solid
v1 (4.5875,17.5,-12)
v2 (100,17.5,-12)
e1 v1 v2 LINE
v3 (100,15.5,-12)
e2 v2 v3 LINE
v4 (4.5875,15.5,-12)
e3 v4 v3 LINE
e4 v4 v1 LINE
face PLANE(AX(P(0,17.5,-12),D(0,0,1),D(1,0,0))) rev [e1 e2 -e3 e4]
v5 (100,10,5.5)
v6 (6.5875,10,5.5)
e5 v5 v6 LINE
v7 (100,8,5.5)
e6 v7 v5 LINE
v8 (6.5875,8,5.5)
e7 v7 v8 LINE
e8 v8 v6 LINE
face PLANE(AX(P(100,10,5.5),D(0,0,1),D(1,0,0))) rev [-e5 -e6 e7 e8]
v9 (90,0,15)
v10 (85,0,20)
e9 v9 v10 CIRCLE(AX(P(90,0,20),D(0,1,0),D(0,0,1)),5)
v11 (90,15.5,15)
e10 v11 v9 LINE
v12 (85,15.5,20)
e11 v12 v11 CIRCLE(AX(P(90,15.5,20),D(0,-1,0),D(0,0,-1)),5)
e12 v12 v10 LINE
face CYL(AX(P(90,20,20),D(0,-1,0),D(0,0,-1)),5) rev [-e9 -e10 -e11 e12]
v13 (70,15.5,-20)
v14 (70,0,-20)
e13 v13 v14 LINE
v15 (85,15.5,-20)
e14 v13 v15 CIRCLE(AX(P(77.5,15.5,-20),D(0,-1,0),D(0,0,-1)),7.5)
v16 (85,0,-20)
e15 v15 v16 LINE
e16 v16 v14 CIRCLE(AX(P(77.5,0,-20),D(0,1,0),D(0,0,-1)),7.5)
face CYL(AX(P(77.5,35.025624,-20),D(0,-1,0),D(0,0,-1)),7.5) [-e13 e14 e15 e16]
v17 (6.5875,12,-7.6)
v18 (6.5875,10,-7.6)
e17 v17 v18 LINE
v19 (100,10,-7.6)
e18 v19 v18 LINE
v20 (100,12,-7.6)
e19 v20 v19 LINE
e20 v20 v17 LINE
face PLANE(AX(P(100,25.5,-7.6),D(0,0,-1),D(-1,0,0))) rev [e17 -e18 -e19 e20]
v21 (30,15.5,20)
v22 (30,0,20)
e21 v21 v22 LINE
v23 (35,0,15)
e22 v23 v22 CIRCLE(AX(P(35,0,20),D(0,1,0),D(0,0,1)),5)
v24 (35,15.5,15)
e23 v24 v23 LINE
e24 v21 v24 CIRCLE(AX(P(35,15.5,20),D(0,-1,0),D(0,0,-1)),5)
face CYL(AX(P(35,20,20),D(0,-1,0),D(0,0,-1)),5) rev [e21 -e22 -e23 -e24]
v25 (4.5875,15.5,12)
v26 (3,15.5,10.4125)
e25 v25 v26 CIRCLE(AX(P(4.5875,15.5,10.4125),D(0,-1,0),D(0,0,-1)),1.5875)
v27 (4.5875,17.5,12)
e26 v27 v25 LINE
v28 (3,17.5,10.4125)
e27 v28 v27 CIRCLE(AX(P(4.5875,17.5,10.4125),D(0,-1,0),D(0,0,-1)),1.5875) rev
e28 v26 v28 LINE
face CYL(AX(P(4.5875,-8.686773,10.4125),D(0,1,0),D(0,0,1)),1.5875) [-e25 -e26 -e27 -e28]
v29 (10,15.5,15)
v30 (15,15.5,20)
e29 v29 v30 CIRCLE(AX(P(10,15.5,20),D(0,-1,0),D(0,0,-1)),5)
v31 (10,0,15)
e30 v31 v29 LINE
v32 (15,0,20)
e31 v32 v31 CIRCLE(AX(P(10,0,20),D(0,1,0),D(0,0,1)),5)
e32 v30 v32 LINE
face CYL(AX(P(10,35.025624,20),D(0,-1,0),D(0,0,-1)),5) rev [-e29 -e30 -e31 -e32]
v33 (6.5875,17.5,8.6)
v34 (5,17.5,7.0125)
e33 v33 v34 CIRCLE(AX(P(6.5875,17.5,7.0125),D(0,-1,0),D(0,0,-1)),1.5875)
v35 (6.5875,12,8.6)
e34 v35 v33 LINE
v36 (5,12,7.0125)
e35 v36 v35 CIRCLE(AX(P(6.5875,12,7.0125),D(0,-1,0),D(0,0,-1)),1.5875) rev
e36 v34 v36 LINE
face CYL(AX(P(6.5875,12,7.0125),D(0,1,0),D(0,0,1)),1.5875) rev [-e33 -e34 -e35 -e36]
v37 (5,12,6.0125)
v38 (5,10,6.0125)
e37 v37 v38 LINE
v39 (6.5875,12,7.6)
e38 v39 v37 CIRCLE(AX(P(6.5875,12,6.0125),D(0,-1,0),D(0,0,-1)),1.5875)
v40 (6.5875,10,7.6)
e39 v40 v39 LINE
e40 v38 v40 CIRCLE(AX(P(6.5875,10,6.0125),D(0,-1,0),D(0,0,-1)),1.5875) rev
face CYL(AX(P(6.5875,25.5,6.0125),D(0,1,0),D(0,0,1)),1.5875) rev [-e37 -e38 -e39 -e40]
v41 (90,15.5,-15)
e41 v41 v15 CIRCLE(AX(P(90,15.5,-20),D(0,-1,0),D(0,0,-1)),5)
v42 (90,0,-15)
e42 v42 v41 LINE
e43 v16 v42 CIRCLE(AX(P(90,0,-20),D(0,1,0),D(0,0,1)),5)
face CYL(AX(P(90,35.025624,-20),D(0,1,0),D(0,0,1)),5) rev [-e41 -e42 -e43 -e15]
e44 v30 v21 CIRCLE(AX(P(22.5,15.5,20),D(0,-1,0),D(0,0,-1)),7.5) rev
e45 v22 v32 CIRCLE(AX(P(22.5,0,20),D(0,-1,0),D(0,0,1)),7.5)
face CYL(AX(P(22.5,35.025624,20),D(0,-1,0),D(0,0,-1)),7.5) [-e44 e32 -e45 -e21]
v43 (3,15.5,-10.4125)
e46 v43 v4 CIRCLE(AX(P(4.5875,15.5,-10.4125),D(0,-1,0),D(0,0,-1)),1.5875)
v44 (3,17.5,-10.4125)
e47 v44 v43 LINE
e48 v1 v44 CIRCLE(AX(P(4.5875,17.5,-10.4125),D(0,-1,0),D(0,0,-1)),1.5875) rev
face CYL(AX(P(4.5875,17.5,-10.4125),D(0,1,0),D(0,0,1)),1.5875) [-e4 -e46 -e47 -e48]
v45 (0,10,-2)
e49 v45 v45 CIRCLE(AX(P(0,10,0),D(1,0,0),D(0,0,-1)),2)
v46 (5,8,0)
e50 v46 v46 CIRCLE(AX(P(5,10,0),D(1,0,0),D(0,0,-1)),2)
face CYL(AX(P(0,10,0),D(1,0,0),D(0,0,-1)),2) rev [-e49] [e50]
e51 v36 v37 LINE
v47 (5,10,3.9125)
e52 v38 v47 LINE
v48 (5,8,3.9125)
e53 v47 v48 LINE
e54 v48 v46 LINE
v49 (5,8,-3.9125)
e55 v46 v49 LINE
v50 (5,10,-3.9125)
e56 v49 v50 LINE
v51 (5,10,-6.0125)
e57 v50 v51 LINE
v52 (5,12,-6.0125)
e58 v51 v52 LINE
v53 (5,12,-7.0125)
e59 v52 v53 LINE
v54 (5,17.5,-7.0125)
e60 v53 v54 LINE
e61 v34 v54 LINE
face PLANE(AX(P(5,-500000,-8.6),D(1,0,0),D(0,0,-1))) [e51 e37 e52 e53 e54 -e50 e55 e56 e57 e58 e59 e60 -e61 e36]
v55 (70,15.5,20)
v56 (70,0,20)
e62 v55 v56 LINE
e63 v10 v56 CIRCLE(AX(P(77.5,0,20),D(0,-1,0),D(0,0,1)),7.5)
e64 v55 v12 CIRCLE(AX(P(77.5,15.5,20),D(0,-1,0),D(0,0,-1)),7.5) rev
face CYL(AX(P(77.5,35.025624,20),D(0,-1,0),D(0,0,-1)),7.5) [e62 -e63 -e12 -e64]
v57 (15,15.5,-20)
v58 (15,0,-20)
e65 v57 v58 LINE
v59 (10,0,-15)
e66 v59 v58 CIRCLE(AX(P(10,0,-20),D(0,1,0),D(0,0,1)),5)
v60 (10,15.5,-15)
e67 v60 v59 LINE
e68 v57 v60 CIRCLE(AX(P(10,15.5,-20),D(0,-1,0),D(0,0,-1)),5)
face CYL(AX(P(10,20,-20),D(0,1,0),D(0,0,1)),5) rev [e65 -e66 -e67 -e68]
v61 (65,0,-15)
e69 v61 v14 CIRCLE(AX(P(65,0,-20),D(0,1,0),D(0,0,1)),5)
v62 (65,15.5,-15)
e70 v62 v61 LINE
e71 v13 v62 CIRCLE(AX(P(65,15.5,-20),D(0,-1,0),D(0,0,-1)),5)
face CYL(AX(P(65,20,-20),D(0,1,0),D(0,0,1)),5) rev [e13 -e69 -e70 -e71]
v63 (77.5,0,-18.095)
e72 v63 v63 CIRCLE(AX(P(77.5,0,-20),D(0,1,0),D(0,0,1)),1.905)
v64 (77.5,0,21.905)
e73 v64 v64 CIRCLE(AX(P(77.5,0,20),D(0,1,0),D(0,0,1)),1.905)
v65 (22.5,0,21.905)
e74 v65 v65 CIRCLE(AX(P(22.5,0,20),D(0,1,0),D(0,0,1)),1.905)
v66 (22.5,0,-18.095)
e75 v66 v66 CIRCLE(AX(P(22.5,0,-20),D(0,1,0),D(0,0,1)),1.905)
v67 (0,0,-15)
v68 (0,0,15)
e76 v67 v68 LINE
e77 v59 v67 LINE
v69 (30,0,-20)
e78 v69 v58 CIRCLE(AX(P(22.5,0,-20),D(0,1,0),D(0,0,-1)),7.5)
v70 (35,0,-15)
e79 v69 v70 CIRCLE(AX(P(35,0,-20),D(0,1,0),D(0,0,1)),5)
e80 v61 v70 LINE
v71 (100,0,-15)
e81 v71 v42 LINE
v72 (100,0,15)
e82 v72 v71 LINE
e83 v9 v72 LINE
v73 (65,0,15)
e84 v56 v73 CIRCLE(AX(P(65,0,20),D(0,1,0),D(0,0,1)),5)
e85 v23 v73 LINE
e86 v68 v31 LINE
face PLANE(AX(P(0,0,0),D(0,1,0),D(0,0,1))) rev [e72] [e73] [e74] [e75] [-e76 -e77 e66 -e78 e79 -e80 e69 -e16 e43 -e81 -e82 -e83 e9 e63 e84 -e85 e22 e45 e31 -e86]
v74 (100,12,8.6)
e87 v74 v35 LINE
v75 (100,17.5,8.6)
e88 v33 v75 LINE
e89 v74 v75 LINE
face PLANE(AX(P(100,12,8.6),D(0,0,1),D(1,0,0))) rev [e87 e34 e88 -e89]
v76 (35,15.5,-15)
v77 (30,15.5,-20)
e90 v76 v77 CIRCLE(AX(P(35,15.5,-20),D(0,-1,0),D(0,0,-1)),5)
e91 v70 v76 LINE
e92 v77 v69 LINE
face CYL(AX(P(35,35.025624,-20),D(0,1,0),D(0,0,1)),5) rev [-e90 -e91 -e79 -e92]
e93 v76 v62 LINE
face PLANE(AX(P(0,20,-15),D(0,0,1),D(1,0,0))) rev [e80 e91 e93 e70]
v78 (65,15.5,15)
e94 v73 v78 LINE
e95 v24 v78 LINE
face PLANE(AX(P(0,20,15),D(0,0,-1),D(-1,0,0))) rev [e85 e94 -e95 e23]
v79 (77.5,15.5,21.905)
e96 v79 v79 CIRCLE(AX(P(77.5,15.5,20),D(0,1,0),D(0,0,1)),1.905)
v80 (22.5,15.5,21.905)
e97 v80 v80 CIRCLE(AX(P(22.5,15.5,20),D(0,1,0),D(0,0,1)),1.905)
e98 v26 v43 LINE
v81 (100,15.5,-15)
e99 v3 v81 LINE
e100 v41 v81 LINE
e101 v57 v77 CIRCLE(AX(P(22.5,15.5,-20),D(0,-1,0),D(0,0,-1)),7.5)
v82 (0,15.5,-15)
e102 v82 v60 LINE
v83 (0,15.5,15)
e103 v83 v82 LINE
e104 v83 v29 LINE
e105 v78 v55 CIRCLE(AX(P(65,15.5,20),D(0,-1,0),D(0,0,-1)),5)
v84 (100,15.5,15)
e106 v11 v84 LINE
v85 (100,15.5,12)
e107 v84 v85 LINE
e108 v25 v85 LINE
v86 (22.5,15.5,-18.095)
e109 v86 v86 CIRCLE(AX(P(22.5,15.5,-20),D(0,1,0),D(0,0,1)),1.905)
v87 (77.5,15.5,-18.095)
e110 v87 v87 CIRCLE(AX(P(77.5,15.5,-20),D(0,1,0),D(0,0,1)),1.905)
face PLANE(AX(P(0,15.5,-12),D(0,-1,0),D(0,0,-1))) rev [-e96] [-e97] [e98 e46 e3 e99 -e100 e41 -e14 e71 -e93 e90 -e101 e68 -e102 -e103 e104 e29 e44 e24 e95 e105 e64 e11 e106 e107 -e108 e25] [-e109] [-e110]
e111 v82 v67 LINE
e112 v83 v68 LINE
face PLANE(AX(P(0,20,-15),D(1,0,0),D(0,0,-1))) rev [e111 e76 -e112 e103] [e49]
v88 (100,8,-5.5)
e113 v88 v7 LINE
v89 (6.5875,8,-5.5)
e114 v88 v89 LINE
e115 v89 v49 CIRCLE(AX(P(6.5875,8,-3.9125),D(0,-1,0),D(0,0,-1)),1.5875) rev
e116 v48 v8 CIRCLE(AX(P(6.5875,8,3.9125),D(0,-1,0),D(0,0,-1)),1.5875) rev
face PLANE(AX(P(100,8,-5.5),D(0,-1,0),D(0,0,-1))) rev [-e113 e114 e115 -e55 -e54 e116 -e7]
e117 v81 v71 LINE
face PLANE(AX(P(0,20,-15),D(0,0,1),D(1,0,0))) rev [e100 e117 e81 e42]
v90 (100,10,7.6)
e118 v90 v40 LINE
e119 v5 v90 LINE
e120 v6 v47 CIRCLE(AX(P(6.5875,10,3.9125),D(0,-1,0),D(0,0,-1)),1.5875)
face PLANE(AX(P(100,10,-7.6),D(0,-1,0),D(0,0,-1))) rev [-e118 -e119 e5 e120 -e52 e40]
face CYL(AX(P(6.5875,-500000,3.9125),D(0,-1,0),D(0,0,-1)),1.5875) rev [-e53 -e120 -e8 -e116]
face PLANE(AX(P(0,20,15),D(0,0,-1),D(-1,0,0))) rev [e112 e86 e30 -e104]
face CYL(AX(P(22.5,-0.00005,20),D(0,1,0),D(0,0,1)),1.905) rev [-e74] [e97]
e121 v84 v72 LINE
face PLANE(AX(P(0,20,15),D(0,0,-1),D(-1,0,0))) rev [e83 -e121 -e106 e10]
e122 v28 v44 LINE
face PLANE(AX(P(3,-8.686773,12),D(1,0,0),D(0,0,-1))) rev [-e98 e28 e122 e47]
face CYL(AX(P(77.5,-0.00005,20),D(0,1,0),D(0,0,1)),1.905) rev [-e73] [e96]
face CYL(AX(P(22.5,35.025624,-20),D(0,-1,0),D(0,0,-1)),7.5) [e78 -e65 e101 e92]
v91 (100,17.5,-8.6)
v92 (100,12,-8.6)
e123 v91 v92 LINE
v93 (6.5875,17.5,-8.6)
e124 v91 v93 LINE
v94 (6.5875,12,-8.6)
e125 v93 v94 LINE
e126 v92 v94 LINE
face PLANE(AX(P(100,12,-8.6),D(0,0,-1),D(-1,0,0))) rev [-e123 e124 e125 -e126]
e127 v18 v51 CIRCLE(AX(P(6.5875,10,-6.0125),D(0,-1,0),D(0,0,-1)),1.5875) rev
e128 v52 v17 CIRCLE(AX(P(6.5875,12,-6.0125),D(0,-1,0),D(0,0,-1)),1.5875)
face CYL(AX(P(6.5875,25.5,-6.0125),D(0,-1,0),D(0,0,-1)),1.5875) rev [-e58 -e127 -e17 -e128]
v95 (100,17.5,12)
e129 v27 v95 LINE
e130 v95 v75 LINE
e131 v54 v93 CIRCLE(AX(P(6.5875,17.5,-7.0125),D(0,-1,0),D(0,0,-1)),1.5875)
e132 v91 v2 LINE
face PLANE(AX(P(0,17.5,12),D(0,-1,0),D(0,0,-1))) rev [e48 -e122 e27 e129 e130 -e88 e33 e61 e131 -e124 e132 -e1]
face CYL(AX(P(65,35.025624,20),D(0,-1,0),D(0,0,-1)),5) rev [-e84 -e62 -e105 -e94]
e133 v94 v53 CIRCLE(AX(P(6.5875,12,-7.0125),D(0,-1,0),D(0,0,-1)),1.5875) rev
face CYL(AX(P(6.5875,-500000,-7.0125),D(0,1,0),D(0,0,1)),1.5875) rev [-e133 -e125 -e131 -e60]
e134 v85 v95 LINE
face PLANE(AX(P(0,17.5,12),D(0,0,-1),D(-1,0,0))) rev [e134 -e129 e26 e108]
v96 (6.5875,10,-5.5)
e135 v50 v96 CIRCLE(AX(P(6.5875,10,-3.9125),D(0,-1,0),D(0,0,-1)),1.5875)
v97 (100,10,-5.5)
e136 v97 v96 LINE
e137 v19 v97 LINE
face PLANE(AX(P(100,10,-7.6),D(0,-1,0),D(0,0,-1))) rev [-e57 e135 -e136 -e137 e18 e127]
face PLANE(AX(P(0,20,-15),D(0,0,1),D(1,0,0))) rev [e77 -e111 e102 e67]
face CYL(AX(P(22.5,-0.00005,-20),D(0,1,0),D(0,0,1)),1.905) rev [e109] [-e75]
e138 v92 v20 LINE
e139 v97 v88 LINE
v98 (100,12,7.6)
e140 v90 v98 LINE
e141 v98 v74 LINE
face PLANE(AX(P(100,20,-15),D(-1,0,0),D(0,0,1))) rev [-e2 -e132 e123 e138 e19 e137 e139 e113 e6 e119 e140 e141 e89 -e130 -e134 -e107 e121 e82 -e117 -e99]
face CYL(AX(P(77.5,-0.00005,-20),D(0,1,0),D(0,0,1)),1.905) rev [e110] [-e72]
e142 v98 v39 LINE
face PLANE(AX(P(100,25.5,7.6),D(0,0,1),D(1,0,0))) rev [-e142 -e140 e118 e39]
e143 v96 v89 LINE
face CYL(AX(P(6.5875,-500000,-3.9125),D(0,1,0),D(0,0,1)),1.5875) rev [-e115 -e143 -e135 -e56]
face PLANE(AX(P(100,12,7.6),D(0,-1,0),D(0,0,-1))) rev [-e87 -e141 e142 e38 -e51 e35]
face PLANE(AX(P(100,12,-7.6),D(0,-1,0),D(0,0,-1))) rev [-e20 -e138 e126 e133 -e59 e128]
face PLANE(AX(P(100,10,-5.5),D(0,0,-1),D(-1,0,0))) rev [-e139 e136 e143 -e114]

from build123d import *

# Parameters (mm, degrees)
SKETCH1_W           = 100
SKETCH1_H           = 30
BOSS_EXTRUDE1_DEPTH = 20
SKETCH2_W           = 15.2
SKETCH2_H           = 15.5
CUT_EXTRUDE1_DEPTH  = 104.07764064
SKETCH3_W           = 11
SKETCH3_H           = 2
CUT_EXTRUDE2_DEPTH  = 104.07764064
SKETCH4_W           = 1
SKETCH4_H           = 8
CUT_EXTRUDE3_DEPTH  = 104.07764064
CUT_EXTRUDE4_DEPTH  = 104.07764064
BOSS_EXTRUDE2_REACH = 104.622
SKETCH6_W           = 5
SKETCH6_H           = 17.2
FILLET1_R           = 1.5875
FILLET2_R           = 1.5875
SKETCH7_W           = 3
SKETCH7_H           = 24
CUT_EXTRUDE5_DEPTH  = 2
FILLET3_R           = 1.5875
BOSS_EXTRUDE3_DEPTH = 15.5
SKETCH9_R           = 1.905
CUT_EXTRUDE6_DEPTH  = 105.864197894
FILLET4_R           = 5
SKETCH10_R          = 2
CUT_EXTRUDE7_DEPTH  = 101.436547133


# Some blends are built 0.0001 mm under size
with BuildPart() as part:
    # Sketch1 → Boss-Extrude1 (new body)
    with BuildSketch(Plane(origin=(0, 0, 0), x_dir=(1, 0, 0), z_dir=(0, 1, 0))):
        with Locations((50, 0)):
            Rectangle(SKETCH1_W, SKETCH1_H)
    extrude(amount=BOSS_EXTRUDE1_DEPTH)

    # Sketch2 → Cut-Extrude1 (cut, through all)
    with BuildSketch(Plane.ZY):
        with Locations((0, 17.75)):
            Rectangle(SKETCH2_W, SKETCH2_H)
    extrude(amount=-CUT_EXTRUDE1_DEPTH, mode=Mode.SUBTRACT)

    # Sketch3 → Cut-Extrude2 (cut, through all)
    with BuildSketch(Plane.ZY):
        with Locations((0, 9)):
            Rectangle(SKETCH3_W, SKETCH3_H)
    extrude(amount=-CUT_EXTRUDE2_DEPTH, mode=Mode.SUBTRACT)

    # Sketch4 → Cut-Extrude3 (cut, through all)
    with BuildSketch(Plane.ZY):
        with Locations((8.1, 16)):
            Rectangle(SKETCH4_W, SKETCH4_H)
        with Locations((-8.1, 16)):
            Rectangle(SKETCH4_W, SKETCH4_H)
    extrude(amount=-CUT_EXTRUDE3_DEPTH, mode=Mode.SUBTRACT)

    # Sketch5 → Cut-Extrude4 (cut, through all)
    with BuildSketch(Plane(origin=(100, 0, 0), x_dir=(0, 0, -1), z_dir=(1, 0, 0))):
        Polygon((-12, 17.5), (12, 17.5), (12, 15.5), (15, 15.5), (15, 17.5), (15, 20), (-15, 20), (-15, 17.5), (-15, 15.5), (-12, 15.5), align=None)
    extrude(amount=-CUT_EXTRUDE4_DEPTH, mode=Mode.SUBTRACT)

    # Sketch6 → Boss-Extrude2 (add, up to next)
    with BuildSketch(Plane(origin=(0, 17.5, 0), x_dir=(1, 0, 0), z_dir=(0, 1, 0)), mode=Mode.PRIVATE) as boss_extrude2_sk1:
        with Locations((2.5, 0)):
            Rectangle(SKETCH6_W, SKETCH6_H)
    boss_extrude2_tool1 = extrude(boss_extrude2_sk1.sketch, amount=-BOSS_EXTRUDE2_REACH, mode=Mode.PRIVATE) - part.part
    add(boss_extrude2_tool1.solids().sort_by_distance((2.5, 17.5, 0))[0])

    # Fillet1
    fillet1_edges = [part.edges().sort_by_distance(p)[0] for p in [
        (5, 9, 5.5),
        (5, 14.75, 8.6),
        (5, 9, -5.5),
        (5, 14.75, -8.6),
    ]]
    fillet(fillet1_edges, radius=FILLET1_R)

    # Fillet2
    # the kernel refuses this fillet: 1.5875 mm, written as the material it adds along each edge
    with BuildSketch(Plane(origin=(5.11271188, 12, 7.6), x_dir=(1, 0, 0), z_dir=(0, -1, 0))) as fillet2_piece_1:
        with BuildLine():
            CenterArc((1.47478812, -1.5875), FILLET2_R, 90, 90)
            Line((-0.11271188, -1.5875), (-0.27146188, -1.5875))
            ThreePointArc((-0.27146188, -1.5875), (-0.27146188, -0.5875), (-0.147478812, 0.05875))
            Line((-0.147478812, 0.05875), (0, 0.15875))
            Line((0, 0.15875), (1.47478812, 0.15875))
            Line((1.47478812, 0.15875), (1.47478812, 0))
        make_face()
    extrude(amount=5.97874055)
    with BuildSketch(Plane(origin=(5.11271188, 12, -7.6), x_dir=(1, 0, 0), z_dir=(0, -1, 0))) as fillet2_piece_2:
        with BuildLine():
            CenterArc((1.47478812, 1.5875), FILLET2_R, 180, 90)
            Line((-0.11271188, 1.5875), (-0.27146188, 1.5875))
            ThreePointArc((-0.27146188, 1.5875), (-0.27146188, 0.5875), (-0.147478812, -0.05875))
            Line((-0.147478812, -0.05875), (0, -0.15875))
            Line((0, -0.15875), (1.47478812, -0.15875))
            Line((1.47478812, -0.15875), (1.47478812, 0))
        make_face()
    extrude(amount=5.97874055)

    # Sketch7 → Cut-Extrude5 (cut)
    with BuildSketch(Plane(origin=(0, 17.5, 0), x_dir=(1, 0, 0), z_dir=(0, 1, 0))):
        with Locations((1.5, 0)):
            Rectangle(SKETCH7_W, SKETCH7_H)
    extrude(amount=-CUT_EXTRUDE5_DEPTH, mode=Mode.SUBTRACT)

    # Fillet3
    fillet3_edges = [part.edges().sort_by_distance(p)[0] for p in [
        (3, 16.5, 12),
        (3, 16.5, -12),
    ]]
    fillet(fillet3_edges, radius=FILLET3_R)

    # Sketch8 → Boss-Extrude3 (add)
    with BuildSketch(Plane.XZ):
        with BuildLine():
            Line((15, 15), (15, 20))
            ThreePointArc((15, 20), (22.5, 27.5), (30, 20))
            Line((30, 20), (30, 15))
            Line((30, 15), (15, 15))
        make_face()
        with BuildLine():
            Line((70, 15), (70, 20))
            ThreePointArc((70, 20), (77.5, 27.5), (85, 20))
            Line((85, 20), (85, 15))
            Line((85, 15), (70, 15))
        make_face()
    boss_extrude3 = extrude(amount=-BOSS_EXTRUDE3_DEPTH)

    # Mirror1: Boss-Extrude3 across plane
    add(boss_extrude3.mirror(Plane.XY))

    # Sketch9 → Cut-Extrude6 (cut, through all)
    with BuildSketch(Plane(origin=(0, 15.5, 0), x_dir=(1, 0, 0), z_dir=(0, 1, 0))):
        with Locations(Location((22.5, 20, 0), (0, 0, 270))):
            Circle(SKETCH9_R)
        with Locations(Location((77.5, 20, 0), (0, 0, 270))):
            Circle(SKETCH9_R)
        with Locations(Location((77.5, -20, 0), (0, 0, 270))):
            Circle(SKETCH9_R)
        with Locations(Location((22.5, -20, 0), (0, 0, 270))):
            Circle(SKETCH9_R)
    extrude(amount=-CUT_EXTRUDE6_DEPTH, mode=Mode.SUBTRACT)

    # Fillet4
    fillet4_edges = [part.edges().sort_by_distance(p)[0] for p in [
        (15, 7.75, 15),
        (30, 7.75, 15),
        (70, 7.75, 15),
        (85, 7.75, 15),
        (85, 7.75, -15),
        (70, 7.75, -15),
        (30, 7.75, -15),
        (15, 7.75, -15),
    ]]
    fillet(fillet4_edges, radius=FILLET4_R - 0.0001)  # a hair under: the kernel refuses the full size

    # Sketch10 → Cut-Extrude7 (cut, through all)
    with BuildSketch(Plane(origin=(5, 0, 0), x_dir=(0, 0, -1), z_dir=(1, 0, 0))):
        with Locations((0, 10)):
            Circle(SKETCH10_R)
    extrude(amount=-CUT_EXTRUDE7_DEPTH, mode=Mode.SUBTRACT)


solid = part.part
